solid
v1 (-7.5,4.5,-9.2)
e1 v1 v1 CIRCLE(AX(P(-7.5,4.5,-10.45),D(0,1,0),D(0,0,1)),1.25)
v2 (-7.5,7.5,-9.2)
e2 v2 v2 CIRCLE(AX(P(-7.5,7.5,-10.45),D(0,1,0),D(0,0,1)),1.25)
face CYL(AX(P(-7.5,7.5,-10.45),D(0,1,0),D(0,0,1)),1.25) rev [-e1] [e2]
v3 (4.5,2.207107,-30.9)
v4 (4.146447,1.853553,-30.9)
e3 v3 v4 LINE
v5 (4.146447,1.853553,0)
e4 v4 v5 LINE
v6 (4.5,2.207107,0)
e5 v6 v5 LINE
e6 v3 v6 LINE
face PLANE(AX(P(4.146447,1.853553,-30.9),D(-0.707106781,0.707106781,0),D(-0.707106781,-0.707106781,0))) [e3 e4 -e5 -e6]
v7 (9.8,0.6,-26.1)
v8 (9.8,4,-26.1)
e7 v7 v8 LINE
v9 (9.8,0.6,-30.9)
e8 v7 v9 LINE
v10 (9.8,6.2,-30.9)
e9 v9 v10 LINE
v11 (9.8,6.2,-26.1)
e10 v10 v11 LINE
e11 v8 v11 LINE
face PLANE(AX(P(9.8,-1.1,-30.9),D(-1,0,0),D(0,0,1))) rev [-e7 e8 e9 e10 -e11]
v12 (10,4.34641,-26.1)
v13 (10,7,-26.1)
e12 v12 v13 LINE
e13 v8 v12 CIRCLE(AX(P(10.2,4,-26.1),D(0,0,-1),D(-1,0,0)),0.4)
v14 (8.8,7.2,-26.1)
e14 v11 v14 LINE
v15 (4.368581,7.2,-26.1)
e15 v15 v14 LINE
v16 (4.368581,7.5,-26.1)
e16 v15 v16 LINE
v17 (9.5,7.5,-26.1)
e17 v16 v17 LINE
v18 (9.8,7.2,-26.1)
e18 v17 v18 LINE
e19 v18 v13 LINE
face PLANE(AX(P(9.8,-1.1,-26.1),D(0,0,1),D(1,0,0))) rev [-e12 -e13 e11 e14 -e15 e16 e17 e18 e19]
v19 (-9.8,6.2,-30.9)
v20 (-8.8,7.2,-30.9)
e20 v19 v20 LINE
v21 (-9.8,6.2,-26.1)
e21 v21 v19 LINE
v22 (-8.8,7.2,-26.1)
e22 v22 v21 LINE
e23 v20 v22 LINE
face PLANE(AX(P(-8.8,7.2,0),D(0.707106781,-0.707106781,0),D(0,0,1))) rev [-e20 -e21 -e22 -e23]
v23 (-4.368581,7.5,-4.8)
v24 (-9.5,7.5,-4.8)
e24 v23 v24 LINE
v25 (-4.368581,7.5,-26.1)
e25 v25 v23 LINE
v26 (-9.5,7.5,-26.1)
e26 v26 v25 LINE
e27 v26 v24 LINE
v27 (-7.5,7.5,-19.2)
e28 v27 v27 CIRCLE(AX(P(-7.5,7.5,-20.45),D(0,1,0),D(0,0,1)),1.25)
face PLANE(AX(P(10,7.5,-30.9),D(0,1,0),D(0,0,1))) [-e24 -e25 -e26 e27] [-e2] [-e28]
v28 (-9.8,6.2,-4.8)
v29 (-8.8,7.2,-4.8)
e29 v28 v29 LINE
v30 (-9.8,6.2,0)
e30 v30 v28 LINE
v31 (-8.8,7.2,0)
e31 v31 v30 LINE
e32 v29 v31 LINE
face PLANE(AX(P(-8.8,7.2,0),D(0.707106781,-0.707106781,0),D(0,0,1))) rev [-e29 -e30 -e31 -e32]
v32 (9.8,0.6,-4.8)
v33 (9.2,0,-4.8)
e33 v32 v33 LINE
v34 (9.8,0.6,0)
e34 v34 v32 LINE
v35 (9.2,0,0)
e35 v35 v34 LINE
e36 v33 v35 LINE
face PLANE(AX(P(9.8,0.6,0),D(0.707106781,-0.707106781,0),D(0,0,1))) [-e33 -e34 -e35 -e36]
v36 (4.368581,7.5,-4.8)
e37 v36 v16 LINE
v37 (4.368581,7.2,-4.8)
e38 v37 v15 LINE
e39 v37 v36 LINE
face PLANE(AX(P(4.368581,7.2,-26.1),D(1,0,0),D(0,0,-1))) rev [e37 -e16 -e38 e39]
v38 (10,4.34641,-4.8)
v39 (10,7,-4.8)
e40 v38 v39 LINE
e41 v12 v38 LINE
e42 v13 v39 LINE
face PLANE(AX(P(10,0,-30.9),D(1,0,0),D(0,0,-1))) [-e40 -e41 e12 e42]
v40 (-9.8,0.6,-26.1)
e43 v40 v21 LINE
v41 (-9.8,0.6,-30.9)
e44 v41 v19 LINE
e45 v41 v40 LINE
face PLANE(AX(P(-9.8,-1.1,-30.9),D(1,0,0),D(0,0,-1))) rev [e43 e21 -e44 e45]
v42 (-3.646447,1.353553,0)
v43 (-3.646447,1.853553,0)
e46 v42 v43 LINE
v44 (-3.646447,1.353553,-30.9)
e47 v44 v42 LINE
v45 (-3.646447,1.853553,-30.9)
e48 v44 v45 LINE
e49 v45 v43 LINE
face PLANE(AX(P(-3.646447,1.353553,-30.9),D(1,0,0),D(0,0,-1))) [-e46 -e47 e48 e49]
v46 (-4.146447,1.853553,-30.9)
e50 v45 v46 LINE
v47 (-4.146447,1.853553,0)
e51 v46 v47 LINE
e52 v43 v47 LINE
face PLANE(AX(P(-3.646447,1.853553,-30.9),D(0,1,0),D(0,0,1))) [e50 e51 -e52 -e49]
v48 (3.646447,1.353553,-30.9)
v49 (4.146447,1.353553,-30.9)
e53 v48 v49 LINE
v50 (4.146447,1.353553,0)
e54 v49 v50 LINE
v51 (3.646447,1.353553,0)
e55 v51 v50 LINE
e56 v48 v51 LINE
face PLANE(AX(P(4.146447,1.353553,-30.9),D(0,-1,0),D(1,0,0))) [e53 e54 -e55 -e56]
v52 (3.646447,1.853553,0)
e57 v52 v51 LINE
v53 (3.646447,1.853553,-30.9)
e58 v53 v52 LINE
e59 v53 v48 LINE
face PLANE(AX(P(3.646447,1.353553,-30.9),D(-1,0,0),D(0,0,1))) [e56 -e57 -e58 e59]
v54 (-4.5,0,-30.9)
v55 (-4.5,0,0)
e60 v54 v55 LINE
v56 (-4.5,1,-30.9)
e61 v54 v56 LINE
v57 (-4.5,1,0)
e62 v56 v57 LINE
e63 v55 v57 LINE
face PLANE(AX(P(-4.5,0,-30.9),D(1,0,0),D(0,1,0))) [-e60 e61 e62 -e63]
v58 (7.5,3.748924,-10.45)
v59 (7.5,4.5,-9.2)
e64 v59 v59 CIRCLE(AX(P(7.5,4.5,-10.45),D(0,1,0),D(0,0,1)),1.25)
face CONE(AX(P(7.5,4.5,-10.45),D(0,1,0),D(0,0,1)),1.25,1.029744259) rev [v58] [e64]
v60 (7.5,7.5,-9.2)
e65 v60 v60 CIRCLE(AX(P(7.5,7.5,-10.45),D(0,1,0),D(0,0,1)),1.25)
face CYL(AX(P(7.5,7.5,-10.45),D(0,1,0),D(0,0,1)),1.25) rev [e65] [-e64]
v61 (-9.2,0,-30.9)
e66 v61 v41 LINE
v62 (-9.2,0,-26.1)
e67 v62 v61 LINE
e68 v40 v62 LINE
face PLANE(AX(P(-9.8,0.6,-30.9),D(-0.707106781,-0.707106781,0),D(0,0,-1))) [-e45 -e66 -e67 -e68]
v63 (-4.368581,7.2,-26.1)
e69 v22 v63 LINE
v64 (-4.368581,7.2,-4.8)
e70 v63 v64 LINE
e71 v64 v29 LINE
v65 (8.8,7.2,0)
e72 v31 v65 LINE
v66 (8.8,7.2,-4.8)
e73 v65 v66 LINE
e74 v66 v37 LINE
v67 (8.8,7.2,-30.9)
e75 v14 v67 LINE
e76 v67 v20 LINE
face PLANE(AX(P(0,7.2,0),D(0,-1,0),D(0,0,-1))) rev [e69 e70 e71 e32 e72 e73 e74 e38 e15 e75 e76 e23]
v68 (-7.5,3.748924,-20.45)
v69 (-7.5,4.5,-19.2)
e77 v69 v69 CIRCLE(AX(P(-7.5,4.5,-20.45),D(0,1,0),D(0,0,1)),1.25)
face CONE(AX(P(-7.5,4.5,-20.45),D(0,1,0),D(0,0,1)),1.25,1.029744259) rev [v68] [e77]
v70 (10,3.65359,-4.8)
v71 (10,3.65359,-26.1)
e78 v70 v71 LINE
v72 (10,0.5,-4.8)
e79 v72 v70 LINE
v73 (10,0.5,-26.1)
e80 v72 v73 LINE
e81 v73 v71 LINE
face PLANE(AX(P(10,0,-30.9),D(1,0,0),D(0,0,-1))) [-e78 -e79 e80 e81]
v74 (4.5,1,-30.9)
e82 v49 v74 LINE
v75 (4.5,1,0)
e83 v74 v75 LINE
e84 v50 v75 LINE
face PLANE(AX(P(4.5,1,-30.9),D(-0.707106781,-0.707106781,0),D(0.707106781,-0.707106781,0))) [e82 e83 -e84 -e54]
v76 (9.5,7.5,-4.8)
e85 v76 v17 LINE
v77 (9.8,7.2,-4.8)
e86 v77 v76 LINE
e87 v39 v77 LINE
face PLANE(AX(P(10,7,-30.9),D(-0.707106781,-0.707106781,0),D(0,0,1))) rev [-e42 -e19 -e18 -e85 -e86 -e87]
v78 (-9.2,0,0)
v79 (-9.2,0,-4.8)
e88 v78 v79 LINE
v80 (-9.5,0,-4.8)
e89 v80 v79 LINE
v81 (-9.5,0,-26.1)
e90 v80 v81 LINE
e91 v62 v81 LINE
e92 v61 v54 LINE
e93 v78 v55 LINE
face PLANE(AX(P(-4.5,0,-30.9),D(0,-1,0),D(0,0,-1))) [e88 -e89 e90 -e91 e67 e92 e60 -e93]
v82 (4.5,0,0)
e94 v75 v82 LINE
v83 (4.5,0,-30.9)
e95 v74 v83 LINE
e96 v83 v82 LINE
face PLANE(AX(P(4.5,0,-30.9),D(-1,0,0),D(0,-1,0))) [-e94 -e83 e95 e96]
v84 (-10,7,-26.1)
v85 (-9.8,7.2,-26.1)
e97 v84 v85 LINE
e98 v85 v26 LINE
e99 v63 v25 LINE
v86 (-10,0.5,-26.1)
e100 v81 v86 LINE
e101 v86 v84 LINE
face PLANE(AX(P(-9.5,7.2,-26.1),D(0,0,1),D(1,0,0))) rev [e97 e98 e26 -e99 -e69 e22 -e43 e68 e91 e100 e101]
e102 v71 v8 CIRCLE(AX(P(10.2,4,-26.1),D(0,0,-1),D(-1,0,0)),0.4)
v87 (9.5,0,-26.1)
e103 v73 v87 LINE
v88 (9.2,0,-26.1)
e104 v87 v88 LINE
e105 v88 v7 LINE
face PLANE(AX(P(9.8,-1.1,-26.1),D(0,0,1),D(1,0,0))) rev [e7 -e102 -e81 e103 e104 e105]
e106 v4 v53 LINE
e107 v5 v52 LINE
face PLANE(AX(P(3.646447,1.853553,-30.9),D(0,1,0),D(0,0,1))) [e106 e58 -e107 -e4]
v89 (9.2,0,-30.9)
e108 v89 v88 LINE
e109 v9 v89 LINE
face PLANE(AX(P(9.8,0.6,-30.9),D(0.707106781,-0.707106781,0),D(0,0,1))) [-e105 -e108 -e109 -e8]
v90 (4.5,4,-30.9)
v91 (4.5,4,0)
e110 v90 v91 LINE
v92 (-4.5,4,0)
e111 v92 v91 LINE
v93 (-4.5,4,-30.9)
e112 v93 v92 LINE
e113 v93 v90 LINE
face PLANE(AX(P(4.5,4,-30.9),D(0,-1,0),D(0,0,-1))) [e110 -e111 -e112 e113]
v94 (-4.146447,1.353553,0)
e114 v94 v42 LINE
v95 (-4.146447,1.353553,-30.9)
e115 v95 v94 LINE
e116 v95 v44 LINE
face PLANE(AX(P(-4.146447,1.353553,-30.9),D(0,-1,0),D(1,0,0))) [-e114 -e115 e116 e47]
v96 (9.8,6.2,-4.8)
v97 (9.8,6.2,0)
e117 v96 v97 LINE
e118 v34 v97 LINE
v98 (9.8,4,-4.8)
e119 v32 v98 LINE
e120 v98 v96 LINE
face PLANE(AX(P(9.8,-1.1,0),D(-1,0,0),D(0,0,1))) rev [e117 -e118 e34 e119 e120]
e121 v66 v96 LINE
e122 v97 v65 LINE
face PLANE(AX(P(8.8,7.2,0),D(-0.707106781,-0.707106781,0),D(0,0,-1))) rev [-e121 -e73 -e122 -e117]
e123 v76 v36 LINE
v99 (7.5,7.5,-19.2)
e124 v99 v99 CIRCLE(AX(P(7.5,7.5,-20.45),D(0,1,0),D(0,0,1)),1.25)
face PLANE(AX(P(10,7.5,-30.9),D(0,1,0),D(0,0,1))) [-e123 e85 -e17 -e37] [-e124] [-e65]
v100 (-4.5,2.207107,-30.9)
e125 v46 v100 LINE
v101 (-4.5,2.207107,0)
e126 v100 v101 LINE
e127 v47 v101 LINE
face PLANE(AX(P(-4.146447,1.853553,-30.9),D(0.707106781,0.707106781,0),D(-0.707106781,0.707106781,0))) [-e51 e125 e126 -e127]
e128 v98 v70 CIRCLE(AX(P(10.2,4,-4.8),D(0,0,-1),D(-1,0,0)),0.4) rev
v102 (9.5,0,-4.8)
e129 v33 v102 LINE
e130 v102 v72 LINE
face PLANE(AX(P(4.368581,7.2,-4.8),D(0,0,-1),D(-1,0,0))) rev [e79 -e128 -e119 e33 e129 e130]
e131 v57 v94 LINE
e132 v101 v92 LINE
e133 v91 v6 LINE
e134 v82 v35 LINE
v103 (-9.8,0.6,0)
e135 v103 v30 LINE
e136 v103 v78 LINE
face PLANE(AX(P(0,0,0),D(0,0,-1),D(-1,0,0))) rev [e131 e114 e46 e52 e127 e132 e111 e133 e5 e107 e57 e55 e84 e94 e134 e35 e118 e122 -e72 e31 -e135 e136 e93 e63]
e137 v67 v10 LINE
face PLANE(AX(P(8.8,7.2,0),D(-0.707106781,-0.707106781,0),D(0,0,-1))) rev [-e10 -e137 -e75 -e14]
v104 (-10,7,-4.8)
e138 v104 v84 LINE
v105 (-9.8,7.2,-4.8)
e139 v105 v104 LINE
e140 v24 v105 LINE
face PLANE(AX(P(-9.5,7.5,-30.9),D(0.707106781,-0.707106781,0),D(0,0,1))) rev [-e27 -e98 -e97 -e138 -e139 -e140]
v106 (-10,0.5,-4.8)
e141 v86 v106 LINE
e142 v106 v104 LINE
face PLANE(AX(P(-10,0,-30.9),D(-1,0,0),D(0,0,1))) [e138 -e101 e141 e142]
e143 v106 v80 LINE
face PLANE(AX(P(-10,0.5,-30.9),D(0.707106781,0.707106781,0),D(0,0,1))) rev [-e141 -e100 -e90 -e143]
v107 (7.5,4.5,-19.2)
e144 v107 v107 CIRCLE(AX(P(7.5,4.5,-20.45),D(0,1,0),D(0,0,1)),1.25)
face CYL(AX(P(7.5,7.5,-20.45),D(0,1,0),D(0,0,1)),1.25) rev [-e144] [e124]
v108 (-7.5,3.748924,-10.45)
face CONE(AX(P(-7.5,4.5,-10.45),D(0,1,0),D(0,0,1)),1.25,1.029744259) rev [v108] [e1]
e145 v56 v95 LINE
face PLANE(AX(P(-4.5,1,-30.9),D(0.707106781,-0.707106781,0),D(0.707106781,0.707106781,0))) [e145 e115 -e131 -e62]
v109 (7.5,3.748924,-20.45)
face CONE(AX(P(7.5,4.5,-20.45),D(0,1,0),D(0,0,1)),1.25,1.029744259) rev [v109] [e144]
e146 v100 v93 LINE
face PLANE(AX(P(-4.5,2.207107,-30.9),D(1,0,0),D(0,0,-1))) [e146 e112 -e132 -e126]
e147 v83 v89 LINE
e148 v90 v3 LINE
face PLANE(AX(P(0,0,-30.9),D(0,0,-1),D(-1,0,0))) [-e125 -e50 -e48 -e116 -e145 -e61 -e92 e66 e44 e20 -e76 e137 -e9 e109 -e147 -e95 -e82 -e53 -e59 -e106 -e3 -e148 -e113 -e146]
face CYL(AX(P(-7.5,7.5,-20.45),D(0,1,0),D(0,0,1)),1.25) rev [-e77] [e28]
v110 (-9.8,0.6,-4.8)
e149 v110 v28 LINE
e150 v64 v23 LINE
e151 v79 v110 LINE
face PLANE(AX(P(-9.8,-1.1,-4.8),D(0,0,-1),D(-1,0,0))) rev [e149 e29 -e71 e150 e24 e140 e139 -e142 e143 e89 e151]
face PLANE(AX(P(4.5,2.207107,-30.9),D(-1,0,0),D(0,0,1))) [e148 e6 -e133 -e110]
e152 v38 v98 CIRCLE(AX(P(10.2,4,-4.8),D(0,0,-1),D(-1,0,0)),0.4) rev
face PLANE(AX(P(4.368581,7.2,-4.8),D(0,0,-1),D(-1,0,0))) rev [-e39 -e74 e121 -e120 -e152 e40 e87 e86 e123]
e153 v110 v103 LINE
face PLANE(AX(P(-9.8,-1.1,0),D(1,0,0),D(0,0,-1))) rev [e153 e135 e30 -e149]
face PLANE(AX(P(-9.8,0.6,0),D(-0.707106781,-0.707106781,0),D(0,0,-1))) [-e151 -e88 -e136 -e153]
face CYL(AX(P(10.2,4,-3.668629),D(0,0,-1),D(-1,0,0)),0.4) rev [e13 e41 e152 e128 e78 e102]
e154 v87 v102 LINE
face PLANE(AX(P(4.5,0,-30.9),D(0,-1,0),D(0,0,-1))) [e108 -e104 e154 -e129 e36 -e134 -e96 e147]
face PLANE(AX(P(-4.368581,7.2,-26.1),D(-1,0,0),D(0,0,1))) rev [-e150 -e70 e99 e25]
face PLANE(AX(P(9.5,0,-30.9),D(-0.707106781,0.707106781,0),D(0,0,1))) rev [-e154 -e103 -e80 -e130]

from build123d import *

# Parameters (mm, degrees)
EXTRUDE_1_DEPTH     = 30.9
CHAMFER_1_SIZE      = 0.5
CUT_EXTRUDE_1_DEPTH = 0.3
SKETCH_6_W          = 0.2
SKETCH_6_H          = 4.8
CUT_EXTRUDE_2_DEPTH = 8.3
CHAMFER_2_SIZE      = 1
CHAMFER_3_SIZE      = 0.6
CHAMFER_4_SIZE      = 0.5
SKETCH_7_R          = 0.4
CUT_EXTRUDE_3_DEPTH = 21.3


with BuildPart() as part:
    # 草图1 → 凸台-拉伸1 (new body)
    with BuildSketch(Plane.XY):
        Polygon((-10, 0), (-10, 7.5), (10, 7.5), (10, 0), (4.5, 0), (4.5, 1), (4.146446609, 1.353553391), (3.646446609, 1.353553391), (3.646446609, 1.853553391), (4.146446609, 1.853553391), (4.5, 2.207106781), (4.5, 4), (-4.5, 4), (-4.5, 2.207106781), (-4.146446609, 1.853553391), (-3.646446609, 1.853553391), (-3.646446609, 1.353553391), (-4.146446609, 1.353553391), (-4.5, 1), (-4.5, 0), align=None)
    extrude(amount=-EXTRUDE_1_DEPTH)

    # 草图3 → M3 螺纹孔1 (revolve, cut)
    with BuildSketch(Plane(origin=(7.5, 7.5, -20.45), x_dir=(0, 0, 1), z_dir=(1, 0, 0))):
        Polygon((0, 0), (0, 3.751075774), (1.25, 3), (1.25, 0), align=None)
    hole_wizard_m3_1 = revolve(axis=Axis((7.5, 13.85, -20.45), (0, -1, 0)), mode=Mode.SUBTRACT)

    # 镜向1: M3 螺纹孔1 across plane
    add(hole_wizard_m3_1.mirror(Plane(origin=(0, 0, -15.45), x_dir=(1, 0, 0), z_dir=(0, 0, -1))), mode=Mode.SUBTRACT)

    # 镜向2: M3 螺纹孔1 across plane
    add(hole_wizard_m3_1.mirror(Plane.ZY), mode=Mode.SUBTRACT)

    # 镜向2 copy 1 sketch → 镜向2 copy 1 (revolve, cut)
    with BuildSketch(Plane(origin=(-7.5, 7.5, -10.45), x_dir=(0, 0, -1), z_dir=(-1, 0, 0))):
        Polygon((0, 0), (0, 3.751075774), (1.25, 3), (1.25, 0), align=None)
    revolve(axis=Axis((-7.5, 13.85, -10.45), (0, -1, 0)), mode=Mode.SUBTRACT)

    # 倒角1
    chamfer_1_edges = [part.edges().sort_by_distance(p)[0] for p in [
        (10, 7.5, -15.45),
        (-10, 7.5, -15.45),
    ]]
    chamfer(chamfer_1_edges, length=CHAMFER_1_SIZE)

    # 草图5 → 切除-拉伸1 (cut)
    with BuildSketch(Plane(origin=(0, 7.5, 0), x_dir=(1, 0, 0), z_dir=(0, 1, 0))):
        Polygon((-9.5, 26.1), (-4.368581018, 26.1), (-4.368581018, 4.8), (-9.5, 4.8), (-10, 4.8), (-10, 0), (10, 0), (10, 4.8), (9.5, 4.8), (4.368581018, 4.8), (4.368581018, 26.1), (9.5, 26.1), (10, 26.1), (10, 30.9), (-10, 30.9), (-10, 26.1), align=None)
    extrude(amount=-CUT_EXTRUDE_1_DEPTH, mode=Mode.SUBTRACT)

    # 草图6 → 切除-拉伸2 (cut)
    with BuildSketch(Plane(origin=(0, 7.2, 0), x_dir=(1, 0, 0), z_dir=(0, 1, 0))):
        with Locations((-9.9, 28.5)):
            Rectangle(SKETCH_6_W, SKETCH_6_H)
        with Locations((9.9, 28.5)):
            Rectangle(SKETCH_6_W, SKETCH_6_H)
        with Locations((9.9, 2.4)):
            Rectangle(SKETCH_6_W, SKETCH_6_H)
        with Locations((-9.9, 2.4)):
            Rectangle(SKETCH_6_W, SKETCH_6_H)
    extrude(amount=-CUT_EXTRUDE_2_DEPTH, mode=Mode.SUBTRACT)

    # 倒角2
    # the kernel refuses this chamfer: 1 mm, written as the material it takes off along each edge
    with BuildSketch(Plane(origin=(-9.8, 7.2, -4.8), x_dir=(-0.027495876610583895, -0.9996219169112968, 0), z_dir=(0, 0, 1)), Plane(origin=(-9.8, 7.2, -33.471682988), x_dir=(-0.027495876610585623, -0.9996219169112968, 0), z_dir=(0, 0, 1))) as chamfer_2_piece_1:
        Polygon((CHAMFER_2_SIZE * 0.999621916911, CHAMFER_2_SIZE * 0.0274958766106), (-CHAMFER_2_SIZE * 0.0274958766106, CHAMFER_2_SIZE * 0.999621916911), (0, 0), align=None)
    extrude(amount=7.371682988, mode=Mode.SUBTRACT)
    with BuildSketch(Plane(origin=(9.8, 7.2, 2.571682988), x_dir=(-0.9996219169112968, 0.02749587661058651, 0), z_dir=(0, 0, -1)), Plane(origin=(9.8, 7.2, -26.1), x_dir=(-0.9996219169112968, 0.02749587661058651, 0), z_dir=(0, 0, -1))) as chamfer_2_piece_2:
        Polygon((CHAMFER_2_SIZE * 0.999621916911, -CHAMFER_2_SIZE * 0.0274958766106), (-CHAMFER_2_SIZE * 0.0274958766106, -CHAMFER_2_SIZE * 0.999621916911), (0, 0), align=None)
    extrude(amount=7.371682988, mode=Mode.SUBTRACT)

    # 倒角3
    chamfer_3_edges = [part.edges().sort_by_distance(p)[0] for p in [
        (-9.8, 0, -28.5),
        (9.8, 0, -28.5),
        (9.8, 0, -2.4),
        (-9.8, 0, -2.4),
    ]]
    chamfer(chamfer_3_edges, length=CHAMFER_3_SIZE)

    # 倒角4
    chamfer_4_edges = [part.edges().sort_by_distance(p)[0] for p in [
        (-10, 0, -15.45),
        (10, 0, -15.45),
    ]]
    chamfer(chamfer_4_edges, length=CHAMFER_4_SIZE)

    # 草图7 → 切除-拉伸3 (cut)
    with BuildSketch(Plane(origin=(0, 0, -26.1), x_dir=(-1, 0, 0), z_dir=(0, 0, -1))):
        with Locations((-10.2, 4)):
            Circle(SKETCH_7_R)
    extrude(amount=-CUT_EXTRUDE_3_DEPTH, mode=Mode.SUBTRACT)


solid = part.part
